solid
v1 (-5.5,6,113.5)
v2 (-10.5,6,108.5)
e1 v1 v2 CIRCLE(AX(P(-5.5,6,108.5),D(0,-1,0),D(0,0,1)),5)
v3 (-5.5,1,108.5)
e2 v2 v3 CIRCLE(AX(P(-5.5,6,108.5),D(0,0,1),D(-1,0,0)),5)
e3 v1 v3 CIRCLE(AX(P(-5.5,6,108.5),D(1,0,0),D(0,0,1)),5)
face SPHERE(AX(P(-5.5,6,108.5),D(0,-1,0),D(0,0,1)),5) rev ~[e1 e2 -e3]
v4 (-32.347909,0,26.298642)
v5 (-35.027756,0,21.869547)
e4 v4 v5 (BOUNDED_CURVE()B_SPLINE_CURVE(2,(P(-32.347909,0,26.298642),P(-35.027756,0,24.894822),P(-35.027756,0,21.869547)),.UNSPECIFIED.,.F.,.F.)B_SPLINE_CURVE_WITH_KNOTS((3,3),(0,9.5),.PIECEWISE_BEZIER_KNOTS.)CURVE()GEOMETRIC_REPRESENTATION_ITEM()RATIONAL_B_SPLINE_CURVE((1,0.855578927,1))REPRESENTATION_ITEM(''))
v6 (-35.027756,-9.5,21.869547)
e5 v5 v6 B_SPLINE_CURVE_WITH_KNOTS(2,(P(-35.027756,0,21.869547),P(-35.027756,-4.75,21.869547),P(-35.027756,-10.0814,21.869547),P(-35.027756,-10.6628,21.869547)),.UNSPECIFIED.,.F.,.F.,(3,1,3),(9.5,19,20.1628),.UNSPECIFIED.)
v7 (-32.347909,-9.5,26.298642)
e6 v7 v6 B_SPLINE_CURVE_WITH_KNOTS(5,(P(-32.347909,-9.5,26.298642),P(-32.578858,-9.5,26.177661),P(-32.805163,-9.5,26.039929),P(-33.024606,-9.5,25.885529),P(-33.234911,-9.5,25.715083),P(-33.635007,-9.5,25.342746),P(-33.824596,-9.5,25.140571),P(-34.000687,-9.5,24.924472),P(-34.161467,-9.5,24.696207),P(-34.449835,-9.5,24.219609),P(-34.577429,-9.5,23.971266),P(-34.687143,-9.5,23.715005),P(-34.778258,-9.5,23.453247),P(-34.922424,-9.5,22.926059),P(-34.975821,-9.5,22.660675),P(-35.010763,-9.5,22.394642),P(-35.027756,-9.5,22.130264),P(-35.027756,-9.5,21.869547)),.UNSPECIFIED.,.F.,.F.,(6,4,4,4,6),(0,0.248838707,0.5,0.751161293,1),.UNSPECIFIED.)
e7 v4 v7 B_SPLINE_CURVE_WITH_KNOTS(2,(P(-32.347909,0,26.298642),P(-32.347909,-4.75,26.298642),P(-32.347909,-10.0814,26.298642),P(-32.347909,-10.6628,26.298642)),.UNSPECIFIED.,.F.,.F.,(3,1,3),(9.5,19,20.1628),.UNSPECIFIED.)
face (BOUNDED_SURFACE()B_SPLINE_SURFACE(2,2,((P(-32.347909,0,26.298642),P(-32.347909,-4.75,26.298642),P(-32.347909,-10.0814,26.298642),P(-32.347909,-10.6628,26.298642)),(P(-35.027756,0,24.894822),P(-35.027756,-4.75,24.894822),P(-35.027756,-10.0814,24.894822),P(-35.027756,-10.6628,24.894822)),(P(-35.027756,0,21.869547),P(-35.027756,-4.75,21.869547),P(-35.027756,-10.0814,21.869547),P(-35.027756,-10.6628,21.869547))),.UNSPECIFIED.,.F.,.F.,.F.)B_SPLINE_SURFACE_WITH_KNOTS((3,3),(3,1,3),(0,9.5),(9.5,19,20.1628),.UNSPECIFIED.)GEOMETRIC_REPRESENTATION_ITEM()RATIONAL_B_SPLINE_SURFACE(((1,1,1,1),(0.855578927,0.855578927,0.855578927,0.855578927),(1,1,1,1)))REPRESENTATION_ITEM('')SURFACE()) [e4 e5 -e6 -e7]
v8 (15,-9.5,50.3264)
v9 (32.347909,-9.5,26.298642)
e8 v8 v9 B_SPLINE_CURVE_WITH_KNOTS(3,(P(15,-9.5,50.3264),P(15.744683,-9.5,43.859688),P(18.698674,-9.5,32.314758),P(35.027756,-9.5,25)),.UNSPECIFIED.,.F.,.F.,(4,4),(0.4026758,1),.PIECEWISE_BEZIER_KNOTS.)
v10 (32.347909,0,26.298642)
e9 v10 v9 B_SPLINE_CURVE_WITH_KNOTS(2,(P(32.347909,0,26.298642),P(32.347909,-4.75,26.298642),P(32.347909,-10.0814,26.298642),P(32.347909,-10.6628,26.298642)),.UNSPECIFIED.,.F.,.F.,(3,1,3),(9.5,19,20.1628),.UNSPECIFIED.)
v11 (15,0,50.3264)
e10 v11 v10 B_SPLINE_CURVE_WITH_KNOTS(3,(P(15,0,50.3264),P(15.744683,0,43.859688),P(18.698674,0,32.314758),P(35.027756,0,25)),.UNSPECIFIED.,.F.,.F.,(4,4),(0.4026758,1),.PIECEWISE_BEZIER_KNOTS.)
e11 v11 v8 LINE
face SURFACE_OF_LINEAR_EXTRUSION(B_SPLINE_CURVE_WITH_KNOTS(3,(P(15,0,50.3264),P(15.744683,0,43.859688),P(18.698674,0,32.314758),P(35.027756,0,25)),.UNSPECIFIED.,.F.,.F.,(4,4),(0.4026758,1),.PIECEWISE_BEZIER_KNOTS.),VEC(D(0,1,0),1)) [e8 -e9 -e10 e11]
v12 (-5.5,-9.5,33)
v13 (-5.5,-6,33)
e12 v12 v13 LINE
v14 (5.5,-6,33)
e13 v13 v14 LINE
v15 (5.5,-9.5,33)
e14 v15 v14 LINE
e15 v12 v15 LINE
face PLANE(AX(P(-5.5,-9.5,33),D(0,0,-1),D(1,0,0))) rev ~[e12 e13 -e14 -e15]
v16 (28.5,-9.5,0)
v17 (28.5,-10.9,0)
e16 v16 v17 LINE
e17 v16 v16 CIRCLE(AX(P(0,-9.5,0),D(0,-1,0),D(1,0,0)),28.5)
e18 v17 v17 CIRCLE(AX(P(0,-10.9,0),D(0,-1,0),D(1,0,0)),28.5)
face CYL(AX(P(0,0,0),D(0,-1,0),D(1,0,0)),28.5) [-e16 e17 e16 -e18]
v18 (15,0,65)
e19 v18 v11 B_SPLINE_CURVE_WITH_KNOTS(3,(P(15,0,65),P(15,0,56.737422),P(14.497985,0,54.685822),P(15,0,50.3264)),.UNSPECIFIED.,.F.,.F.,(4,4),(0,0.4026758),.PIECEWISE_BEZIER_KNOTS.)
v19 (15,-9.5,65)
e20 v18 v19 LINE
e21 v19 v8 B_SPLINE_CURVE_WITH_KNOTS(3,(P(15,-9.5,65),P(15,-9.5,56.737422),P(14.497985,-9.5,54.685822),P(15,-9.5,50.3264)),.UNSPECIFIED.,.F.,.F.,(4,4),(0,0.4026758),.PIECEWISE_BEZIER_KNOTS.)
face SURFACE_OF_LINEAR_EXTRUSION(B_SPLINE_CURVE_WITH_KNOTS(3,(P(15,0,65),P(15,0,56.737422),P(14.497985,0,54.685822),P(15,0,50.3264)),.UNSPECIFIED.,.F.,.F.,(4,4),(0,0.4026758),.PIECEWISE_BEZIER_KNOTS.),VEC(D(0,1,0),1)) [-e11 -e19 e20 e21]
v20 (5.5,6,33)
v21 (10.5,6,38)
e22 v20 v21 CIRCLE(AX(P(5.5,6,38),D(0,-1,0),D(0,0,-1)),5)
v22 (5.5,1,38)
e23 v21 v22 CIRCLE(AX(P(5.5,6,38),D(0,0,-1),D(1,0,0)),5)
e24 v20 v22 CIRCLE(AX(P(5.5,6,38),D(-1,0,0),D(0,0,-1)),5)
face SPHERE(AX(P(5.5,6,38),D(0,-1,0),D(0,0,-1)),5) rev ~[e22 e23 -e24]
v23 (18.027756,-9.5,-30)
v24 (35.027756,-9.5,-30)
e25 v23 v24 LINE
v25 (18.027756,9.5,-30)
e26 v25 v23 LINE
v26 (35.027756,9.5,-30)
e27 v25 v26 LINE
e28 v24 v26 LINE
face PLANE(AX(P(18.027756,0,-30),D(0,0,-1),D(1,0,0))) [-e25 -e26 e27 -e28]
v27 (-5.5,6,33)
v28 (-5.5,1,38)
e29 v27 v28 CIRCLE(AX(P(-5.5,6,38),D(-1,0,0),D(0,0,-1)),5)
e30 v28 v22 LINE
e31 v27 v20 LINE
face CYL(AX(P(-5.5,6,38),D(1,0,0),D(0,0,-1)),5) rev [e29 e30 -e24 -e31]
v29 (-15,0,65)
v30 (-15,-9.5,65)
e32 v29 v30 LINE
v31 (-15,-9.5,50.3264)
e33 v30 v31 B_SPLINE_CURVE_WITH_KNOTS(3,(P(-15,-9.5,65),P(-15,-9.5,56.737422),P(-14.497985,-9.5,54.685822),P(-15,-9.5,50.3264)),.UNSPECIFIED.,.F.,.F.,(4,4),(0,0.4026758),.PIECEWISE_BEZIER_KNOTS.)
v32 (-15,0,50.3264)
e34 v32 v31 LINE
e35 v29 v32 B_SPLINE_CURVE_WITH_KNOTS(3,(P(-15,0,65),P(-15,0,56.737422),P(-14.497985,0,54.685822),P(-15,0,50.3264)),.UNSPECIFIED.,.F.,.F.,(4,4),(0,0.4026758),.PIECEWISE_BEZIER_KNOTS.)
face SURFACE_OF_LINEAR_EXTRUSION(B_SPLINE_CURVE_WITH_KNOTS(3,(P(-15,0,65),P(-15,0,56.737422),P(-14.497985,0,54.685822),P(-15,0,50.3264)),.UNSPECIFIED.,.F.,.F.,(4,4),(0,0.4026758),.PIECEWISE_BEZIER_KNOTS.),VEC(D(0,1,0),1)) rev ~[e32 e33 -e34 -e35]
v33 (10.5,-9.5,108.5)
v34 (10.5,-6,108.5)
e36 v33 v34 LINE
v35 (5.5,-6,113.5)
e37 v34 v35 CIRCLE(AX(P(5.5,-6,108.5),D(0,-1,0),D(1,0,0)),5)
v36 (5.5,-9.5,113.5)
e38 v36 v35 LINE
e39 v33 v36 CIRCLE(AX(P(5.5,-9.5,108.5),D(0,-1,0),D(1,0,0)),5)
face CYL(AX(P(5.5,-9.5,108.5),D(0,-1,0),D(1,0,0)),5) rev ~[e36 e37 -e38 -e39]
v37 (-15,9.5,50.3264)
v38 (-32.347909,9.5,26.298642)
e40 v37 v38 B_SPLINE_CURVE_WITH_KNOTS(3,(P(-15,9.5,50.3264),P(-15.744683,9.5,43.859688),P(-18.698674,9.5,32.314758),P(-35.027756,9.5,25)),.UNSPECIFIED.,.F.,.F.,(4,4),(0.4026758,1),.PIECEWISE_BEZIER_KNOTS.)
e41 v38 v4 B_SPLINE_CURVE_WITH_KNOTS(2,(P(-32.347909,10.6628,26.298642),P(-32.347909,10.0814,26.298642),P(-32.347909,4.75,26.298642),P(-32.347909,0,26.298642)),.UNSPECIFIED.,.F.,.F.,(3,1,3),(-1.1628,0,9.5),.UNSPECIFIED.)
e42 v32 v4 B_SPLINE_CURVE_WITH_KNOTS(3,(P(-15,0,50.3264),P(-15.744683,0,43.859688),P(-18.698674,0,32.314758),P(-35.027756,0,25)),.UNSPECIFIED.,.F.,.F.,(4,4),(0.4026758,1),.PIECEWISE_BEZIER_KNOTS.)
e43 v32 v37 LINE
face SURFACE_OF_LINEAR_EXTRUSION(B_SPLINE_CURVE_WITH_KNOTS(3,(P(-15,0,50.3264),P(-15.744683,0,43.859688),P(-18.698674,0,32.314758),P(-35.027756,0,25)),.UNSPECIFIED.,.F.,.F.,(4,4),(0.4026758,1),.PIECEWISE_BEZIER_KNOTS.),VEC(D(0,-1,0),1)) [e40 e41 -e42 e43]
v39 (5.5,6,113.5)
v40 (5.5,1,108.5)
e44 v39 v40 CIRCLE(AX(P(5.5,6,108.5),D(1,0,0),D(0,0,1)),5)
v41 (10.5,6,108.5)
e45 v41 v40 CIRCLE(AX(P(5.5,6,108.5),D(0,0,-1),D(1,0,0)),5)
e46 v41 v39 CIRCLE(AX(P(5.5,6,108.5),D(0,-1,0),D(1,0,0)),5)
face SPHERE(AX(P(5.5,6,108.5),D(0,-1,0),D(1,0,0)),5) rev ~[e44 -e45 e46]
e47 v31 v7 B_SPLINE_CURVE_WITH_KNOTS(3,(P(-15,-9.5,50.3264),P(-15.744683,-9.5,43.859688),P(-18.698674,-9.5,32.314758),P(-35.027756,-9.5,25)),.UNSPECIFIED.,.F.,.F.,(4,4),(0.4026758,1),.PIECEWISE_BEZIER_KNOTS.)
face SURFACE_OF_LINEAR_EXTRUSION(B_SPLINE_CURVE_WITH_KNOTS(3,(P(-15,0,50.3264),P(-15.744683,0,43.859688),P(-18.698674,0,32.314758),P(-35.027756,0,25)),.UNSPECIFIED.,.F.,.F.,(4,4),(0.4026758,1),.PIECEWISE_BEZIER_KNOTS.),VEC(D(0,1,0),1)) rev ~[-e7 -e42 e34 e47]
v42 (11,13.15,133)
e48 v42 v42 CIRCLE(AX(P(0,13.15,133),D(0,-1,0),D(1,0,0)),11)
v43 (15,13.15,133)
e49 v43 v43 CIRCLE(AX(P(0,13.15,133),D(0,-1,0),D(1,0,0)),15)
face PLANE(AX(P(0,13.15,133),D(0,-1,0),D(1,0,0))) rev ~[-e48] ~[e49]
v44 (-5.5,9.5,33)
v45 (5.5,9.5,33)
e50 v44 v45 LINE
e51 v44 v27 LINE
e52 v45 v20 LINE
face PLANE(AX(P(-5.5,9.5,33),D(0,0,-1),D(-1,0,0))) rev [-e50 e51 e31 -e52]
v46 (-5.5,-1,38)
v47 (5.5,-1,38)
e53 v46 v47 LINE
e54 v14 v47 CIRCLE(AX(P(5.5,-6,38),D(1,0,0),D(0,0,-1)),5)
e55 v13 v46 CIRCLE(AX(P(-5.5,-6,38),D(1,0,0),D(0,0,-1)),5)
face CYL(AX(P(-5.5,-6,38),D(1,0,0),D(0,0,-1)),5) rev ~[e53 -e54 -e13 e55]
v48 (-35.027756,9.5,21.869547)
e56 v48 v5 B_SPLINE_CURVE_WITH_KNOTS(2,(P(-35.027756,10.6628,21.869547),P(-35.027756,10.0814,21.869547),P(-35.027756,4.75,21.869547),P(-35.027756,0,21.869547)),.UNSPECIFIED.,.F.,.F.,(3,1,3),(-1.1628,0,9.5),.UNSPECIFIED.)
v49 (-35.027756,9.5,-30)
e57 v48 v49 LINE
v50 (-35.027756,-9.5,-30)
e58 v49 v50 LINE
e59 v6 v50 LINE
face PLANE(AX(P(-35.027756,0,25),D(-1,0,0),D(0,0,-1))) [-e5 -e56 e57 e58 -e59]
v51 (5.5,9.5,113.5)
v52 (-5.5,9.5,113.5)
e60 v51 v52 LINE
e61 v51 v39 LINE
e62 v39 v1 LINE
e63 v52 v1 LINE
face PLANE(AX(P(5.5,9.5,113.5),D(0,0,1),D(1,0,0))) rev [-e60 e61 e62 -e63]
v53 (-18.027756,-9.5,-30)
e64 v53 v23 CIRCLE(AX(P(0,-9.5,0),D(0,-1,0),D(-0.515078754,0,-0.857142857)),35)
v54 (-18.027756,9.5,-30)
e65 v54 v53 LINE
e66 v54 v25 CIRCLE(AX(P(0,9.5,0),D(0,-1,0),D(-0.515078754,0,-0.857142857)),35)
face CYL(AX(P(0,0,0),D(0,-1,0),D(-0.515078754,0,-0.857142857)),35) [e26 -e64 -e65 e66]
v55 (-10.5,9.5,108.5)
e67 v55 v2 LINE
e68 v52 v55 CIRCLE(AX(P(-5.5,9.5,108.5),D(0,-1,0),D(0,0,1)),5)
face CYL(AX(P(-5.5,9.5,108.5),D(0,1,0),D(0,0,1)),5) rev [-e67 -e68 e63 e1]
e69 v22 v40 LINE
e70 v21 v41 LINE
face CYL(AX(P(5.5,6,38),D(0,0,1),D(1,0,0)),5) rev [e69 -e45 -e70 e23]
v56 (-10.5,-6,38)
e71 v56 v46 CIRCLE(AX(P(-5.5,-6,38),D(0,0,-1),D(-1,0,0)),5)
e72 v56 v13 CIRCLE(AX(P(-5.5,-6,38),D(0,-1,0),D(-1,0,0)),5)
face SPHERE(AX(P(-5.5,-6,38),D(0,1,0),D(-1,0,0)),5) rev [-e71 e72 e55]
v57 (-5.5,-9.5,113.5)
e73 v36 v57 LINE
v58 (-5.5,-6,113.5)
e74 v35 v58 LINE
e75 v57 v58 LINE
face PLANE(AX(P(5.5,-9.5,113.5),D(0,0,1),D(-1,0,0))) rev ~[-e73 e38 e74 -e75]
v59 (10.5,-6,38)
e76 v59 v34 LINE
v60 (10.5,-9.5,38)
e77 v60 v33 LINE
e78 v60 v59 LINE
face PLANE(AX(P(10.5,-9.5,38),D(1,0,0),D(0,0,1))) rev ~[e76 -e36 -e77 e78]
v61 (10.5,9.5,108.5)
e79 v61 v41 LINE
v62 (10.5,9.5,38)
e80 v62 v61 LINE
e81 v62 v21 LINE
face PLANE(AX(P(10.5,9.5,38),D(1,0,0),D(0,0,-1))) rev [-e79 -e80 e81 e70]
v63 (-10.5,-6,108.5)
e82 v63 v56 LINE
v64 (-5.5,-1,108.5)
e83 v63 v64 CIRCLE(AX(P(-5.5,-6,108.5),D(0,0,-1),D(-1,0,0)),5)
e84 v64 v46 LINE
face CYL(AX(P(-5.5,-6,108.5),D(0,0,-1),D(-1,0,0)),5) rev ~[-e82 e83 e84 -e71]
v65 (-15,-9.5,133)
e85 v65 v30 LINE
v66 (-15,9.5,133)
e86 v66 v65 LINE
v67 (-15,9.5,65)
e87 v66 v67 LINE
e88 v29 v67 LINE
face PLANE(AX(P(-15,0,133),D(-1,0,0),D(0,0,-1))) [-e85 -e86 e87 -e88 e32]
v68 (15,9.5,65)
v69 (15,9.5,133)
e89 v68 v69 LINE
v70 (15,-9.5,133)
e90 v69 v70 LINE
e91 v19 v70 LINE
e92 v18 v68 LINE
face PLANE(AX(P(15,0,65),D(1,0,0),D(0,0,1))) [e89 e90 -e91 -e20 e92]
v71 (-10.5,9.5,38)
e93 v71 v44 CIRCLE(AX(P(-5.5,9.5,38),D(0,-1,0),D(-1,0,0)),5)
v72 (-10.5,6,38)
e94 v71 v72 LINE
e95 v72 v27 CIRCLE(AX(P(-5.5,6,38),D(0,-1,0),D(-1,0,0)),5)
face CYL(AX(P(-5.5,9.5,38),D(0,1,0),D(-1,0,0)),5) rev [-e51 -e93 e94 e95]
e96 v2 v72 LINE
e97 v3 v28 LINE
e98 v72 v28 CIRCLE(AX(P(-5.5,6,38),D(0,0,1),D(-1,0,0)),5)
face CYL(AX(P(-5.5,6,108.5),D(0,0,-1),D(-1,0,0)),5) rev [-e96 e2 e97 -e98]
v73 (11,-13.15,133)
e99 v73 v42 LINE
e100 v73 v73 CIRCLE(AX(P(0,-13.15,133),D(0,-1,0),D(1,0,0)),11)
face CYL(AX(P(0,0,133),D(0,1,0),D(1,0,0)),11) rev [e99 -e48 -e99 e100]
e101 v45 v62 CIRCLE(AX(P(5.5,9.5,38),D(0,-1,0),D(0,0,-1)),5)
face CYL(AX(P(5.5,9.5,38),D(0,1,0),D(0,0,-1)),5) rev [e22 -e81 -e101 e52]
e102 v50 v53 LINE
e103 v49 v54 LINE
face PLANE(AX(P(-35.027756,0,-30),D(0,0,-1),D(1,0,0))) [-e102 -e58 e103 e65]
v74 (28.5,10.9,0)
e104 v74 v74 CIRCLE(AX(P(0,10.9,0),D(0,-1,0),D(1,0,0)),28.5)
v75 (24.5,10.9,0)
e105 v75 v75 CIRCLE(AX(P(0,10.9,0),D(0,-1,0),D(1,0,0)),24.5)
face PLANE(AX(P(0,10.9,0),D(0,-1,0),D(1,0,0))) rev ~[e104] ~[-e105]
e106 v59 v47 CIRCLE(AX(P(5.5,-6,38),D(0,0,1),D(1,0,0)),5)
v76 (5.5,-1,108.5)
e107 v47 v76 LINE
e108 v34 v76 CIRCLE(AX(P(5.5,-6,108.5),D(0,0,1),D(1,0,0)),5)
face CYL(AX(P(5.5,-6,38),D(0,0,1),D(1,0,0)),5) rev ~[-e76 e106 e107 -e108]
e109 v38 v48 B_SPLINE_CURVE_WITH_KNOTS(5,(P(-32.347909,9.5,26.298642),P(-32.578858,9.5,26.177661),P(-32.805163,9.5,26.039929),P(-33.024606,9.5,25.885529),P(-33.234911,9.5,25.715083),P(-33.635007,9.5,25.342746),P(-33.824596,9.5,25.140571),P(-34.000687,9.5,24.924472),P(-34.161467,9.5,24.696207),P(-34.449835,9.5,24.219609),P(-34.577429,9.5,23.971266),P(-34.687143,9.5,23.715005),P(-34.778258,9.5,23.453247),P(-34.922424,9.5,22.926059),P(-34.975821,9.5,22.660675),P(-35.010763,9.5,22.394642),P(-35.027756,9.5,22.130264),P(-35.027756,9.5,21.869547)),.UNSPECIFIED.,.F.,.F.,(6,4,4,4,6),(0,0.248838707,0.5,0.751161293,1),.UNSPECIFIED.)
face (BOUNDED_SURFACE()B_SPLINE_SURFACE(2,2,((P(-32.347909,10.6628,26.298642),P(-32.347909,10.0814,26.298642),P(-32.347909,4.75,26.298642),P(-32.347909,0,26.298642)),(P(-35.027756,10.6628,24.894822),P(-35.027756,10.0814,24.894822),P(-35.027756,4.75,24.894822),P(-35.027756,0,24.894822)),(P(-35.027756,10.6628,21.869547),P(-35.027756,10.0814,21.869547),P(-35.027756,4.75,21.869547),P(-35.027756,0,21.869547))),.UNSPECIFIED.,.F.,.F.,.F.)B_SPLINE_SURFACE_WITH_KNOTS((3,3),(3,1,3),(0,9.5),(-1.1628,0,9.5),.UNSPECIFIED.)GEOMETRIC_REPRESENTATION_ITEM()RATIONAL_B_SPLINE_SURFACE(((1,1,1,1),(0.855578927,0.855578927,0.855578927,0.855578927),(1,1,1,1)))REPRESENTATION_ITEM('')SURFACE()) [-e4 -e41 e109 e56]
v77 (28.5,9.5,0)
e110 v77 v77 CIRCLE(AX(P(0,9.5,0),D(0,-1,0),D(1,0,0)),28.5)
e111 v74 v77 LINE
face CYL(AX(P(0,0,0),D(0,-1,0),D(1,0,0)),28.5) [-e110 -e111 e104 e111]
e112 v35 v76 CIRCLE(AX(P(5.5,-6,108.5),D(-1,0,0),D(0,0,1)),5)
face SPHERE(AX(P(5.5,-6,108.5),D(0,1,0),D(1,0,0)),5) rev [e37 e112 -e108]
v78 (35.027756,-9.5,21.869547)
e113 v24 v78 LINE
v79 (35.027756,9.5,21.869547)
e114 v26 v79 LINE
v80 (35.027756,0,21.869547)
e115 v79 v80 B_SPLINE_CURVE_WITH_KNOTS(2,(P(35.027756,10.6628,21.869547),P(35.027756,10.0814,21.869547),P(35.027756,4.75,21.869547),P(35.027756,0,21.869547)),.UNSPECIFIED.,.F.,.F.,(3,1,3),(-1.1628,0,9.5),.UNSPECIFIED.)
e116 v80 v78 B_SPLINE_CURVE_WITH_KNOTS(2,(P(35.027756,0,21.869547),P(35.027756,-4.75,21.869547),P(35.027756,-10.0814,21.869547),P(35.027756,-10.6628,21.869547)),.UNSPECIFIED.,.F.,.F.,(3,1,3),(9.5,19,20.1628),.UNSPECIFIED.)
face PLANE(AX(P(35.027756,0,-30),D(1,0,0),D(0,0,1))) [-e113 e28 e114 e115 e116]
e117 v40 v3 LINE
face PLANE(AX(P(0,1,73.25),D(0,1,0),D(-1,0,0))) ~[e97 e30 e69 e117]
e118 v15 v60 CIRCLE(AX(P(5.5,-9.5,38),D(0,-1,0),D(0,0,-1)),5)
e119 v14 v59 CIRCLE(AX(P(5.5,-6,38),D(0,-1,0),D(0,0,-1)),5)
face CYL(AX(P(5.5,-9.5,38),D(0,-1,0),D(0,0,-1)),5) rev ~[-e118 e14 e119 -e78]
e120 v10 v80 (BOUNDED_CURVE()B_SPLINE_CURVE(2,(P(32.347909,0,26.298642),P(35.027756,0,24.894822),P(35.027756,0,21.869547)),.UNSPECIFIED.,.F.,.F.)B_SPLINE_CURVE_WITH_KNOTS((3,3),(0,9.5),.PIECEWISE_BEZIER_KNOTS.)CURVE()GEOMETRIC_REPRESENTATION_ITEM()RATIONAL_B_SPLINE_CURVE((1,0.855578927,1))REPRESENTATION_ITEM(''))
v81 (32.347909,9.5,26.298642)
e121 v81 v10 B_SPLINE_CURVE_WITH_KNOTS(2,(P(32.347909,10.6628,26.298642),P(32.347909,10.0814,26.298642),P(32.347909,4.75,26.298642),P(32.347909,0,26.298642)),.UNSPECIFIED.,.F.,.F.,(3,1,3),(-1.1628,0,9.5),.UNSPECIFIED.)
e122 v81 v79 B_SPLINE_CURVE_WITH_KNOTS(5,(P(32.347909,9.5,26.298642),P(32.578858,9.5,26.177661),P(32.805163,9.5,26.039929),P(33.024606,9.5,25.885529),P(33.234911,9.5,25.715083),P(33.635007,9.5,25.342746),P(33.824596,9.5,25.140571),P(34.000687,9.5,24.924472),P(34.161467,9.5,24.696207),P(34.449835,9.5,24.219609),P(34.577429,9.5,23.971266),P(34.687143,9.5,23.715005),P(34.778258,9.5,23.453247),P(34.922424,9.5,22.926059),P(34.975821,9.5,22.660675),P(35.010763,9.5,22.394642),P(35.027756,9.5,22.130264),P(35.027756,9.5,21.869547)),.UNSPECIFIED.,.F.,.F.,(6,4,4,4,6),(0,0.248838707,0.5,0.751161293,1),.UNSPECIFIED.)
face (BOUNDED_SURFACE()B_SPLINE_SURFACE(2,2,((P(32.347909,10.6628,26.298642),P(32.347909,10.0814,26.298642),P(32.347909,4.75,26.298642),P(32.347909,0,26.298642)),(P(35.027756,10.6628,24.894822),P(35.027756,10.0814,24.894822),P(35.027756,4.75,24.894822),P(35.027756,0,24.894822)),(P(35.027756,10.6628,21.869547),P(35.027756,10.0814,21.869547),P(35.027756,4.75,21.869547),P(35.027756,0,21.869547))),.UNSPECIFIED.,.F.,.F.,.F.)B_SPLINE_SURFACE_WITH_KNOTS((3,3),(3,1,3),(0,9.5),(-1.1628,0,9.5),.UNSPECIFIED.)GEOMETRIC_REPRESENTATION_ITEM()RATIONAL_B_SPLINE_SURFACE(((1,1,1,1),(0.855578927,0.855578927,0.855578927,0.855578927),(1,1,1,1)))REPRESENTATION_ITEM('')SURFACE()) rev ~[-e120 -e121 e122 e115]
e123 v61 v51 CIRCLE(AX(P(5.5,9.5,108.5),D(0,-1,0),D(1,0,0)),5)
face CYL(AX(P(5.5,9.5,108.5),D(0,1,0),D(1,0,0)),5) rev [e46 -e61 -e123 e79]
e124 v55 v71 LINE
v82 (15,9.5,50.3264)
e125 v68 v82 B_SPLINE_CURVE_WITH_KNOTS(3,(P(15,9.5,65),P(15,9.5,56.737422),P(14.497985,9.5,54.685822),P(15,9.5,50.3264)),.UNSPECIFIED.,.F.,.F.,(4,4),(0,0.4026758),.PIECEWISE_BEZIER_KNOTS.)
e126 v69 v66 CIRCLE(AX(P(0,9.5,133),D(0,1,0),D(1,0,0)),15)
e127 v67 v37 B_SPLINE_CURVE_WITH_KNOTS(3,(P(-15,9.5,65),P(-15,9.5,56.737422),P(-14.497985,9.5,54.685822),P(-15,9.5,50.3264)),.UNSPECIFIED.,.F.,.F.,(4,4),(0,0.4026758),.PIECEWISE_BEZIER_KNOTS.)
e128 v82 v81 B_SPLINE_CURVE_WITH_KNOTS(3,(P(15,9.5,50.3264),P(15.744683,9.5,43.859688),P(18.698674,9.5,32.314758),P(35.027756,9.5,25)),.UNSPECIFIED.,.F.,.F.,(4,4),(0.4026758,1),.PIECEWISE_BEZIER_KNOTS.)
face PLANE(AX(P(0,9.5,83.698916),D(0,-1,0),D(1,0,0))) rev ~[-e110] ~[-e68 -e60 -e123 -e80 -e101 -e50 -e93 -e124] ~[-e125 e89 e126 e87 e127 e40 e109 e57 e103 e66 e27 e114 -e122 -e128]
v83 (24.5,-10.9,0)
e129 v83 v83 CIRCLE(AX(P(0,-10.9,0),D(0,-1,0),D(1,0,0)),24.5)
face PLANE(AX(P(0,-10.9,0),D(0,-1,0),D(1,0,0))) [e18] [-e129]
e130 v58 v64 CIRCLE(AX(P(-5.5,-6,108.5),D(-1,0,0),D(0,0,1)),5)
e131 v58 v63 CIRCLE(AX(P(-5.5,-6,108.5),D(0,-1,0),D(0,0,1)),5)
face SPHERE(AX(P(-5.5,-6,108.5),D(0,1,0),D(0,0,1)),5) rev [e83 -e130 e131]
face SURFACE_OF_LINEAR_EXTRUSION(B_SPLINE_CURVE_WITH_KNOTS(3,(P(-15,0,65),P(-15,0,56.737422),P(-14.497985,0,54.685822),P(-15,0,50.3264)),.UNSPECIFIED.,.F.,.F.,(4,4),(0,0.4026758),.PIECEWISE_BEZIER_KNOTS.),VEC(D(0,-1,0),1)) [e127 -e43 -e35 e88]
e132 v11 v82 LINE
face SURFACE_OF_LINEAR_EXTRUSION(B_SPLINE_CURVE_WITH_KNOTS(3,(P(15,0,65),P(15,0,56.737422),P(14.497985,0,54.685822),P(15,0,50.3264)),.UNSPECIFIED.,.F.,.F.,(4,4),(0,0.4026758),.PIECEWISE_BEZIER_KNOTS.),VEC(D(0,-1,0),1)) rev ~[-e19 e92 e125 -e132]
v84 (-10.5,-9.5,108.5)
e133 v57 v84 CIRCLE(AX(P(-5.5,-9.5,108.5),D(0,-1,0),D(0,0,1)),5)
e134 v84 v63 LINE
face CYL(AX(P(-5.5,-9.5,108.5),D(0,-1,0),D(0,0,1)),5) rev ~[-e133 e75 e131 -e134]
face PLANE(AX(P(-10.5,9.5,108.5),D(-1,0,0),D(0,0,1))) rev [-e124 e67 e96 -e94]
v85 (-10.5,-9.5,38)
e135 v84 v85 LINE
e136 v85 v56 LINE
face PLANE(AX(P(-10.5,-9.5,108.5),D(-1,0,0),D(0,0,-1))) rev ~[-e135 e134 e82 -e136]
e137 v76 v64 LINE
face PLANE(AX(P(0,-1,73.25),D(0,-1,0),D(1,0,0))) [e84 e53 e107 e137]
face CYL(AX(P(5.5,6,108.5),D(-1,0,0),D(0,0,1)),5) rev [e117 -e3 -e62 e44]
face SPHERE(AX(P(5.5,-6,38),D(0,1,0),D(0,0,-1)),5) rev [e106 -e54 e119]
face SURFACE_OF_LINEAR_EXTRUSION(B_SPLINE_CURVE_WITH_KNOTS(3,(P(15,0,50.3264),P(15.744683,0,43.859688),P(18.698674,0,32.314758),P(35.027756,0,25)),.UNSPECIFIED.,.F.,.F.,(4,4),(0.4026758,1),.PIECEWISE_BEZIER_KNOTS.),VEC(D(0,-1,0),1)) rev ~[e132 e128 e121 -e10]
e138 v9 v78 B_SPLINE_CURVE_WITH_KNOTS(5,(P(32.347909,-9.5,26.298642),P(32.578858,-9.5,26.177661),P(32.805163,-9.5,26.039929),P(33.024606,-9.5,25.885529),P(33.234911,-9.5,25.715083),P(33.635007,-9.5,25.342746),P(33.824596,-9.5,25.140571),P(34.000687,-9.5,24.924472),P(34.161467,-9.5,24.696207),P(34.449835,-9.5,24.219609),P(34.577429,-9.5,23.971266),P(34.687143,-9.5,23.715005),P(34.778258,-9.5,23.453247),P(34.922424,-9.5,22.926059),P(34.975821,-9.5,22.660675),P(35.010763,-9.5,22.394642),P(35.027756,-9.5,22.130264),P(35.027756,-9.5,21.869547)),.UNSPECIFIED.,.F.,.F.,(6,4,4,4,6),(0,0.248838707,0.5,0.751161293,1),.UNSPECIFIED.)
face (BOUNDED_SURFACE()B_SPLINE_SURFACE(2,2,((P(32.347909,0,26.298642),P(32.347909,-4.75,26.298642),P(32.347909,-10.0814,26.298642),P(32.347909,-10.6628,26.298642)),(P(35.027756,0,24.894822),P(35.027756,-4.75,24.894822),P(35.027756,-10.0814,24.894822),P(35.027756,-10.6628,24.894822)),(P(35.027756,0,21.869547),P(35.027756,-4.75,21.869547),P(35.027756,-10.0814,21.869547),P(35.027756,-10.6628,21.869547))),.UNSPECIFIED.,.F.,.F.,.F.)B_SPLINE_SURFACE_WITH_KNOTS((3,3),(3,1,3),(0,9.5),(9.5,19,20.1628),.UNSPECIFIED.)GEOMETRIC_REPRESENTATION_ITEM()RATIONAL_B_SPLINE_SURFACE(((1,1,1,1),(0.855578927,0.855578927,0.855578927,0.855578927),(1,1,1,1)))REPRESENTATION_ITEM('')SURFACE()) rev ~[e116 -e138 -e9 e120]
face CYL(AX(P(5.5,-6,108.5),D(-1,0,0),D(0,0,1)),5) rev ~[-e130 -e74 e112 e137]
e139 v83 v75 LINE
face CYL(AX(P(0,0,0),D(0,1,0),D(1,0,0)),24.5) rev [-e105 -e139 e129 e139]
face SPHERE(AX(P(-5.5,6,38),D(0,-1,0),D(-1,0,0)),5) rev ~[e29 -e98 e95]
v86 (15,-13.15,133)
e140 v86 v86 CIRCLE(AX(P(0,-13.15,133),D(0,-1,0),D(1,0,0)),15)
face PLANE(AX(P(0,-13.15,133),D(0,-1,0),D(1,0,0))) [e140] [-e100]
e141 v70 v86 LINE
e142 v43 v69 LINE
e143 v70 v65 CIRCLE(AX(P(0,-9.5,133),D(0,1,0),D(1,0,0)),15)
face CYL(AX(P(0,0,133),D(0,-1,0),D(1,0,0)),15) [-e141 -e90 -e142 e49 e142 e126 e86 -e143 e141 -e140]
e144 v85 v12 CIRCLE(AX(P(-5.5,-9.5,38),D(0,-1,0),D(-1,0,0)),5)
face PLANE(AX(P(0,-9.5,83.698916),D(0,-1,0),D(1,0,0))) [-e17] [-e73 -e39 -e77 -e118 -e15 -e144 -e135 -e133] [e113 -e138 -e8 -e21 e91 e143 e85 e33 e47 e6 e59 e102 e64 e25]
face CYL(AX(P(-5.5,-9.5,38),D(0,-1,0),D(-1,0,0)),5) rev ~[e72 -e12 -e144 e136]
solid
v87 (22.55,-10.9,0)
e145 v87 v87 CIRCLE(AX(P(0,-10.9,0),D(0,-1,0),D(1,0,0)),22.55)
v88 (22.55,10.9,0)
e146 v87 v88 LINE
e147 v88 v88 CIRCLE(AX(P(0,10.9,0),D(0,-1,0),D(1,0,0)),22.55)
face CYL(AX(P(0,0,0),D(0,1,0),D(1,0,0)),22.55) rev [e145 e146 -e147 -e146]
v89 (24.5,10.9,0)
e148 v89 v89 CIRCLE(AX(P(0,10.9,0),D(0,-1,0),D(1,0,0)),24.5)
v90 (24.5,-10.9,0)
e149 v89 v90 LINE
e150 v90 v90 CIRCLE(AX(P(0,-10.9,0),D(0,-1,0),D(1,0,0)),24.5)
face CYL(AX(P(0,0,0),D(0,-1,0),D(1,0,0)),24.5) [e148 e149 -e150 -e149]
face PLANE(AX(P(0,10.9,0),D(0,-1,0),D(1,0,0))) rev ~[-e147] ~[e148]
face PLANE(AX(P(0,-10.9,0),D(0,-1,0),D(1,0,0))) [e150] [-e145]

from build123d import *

# Parameters (mm, degrees)
F0_R     = 28.5
F1_DEPTH = 9.5
F0_R_2   = 24.5
F2_DEPTH = 10.9
F0_R_3   = 11
F3_DEPTH = 13.15
F0_R_4   = 22.55
F4_DEPTH = 10.9
F6_DEPTH = 8.5
F7_R     = 5
F9_R     = 5


# Not quite as in the source:
# - a feature of the source that left no trace in its solid (it failed there, or was rolled back) is left out
# - a pattern or mirror of a feature is missing from the dataset's text; its kind, count and spacing are read off the source's solid


with BuildPart() as f1:
    # F0 (on Front) → F1 (new body, symmetric)
    with BuildSketch(Plane.XZ):
        with BuildLine():
            Line((15, 65), (15, 133))
            ThreePointArc((15, 133), (0, 118), (-15, 133))
            Line((-15, 133), (-15, 65))
            add(Edge.make_bspline(
                [(-15, 65), (-15, 56.7374224028), (-14.4979846104, 54.6858215893), (-15, 50.3263995051)],
                knots=[0, 0, 0, 0, 0.4026758, 0.4026758, 0.4026758, 0.4026758], degree=3))
            Line((-15, 50.3263995051), (-15, 31.6227766017))
            ThreePointArc((-15, 31.6227766017), (0, 35), (15, 31.6227766017))
            Line((15, 31.6227766017), (15, 50.3263995051))
            add(Edge.make_bspline(
                [(15, 65), (15, 56.7374224028), (14.4979846104, 54.6858215893), (15, 50.3263995051)],
                knots=[0, 0, 0, 0, 0.4026758, 0.4026758, 0.4026758, 0.4026758], degree=3))
        make_face()
        with BuildLine():
            Line((-15, 31.6227766017), (-15, 50.3263995051))
            add(Edge.make_bspline(
                [(-15, 50.3263995051), (-15.7446832935, 43.8596878017), (-18.6986741861, 32.3147582025), (-35.0277563773, 25)],
                knots=[0.4026758, 0.4026758, 0.4026758, 0.4026758, 1, 1, 1, 1], degree=3))
            Line((-35.0277563773, 25), (-35.0277563773, -30))
            Line((-35.0277563773, -30), (-18.0277563773, -30))
            ThreePointArc((-18.0277563773, -30), (-34.9578291925, 1.7176082629), (-15, 31.6227766017))
        make_face()
        with BuildLine():
            add(Edge.make_bspline(
                [(15, 50.3263995051), (15.7446832935, 43.8596878017), (18.6986741861, 32.3147582025), (35.0277563773, 25)],
                knots=[0.4026758, 0.4026758, 0.4026758, 0.4026758, 1, 1, 1, 1], degree=3))
            Line((15, 50.3263995051), (15, 31.6227766017))
            ThreePointArc((15, 31.6227766017), (29.5803989155, 18.7082869339), (35, 0))
            ThreePointArc((35, 0), (30.4628583131, -17.2341017578), (18.0277563773, -30))
            Line((18.0277563773, -30), (35.0277563773, -30))
            Line((35.0277563773, -30), (35.0277563773, 25))
        make_face()
        with BuildLine():
            ThreePointArc((35, 0), (29.5803989155, 18.7082869339), (15, 31.6227766017))
            ThreePointArc((15, 31.6227766017), (0, 35), (-15, 31.6227766017))
            ThreePointArc((-15, 31.6227766017), (-34.9578291925, 1.7176082629), (-18.0277563773, -30))
            ThreePointArc((-18.0277563773, -30), (0, -35), (18.0277563773, -30))
            ThreePointArc((18.0277563773, -30), (30.4628583131, -17.2341017578), (35, 0))
        make_face()
        Circle(F0_R, mode=Mode.SUBTRACT)
    extrude(amount=F1_DEPTH, both=True)

    # F0 (on Front) → F2 (join, symmetric)
    with BuildSketch(Plane.XZ):
        Circle(F0_R)
        Circle(F0_R_2, mode=Mode.SUBTRACT)
    extrude(amount=F2_DEPTH, both=True)

    # F0 (on Front) → F3 (join, symmetric)
    with BuildSketch(Plane.XZ):
        with BuildLine():
            ThreePointArc((-15, 133), (0, 118), (15, 133))
            ThreePointArc((15, 133), (0, 148), (-15, 133))
        make_face()
        with Locations((0, 133)):
            Circle(F0_R_3, mode=Mode.SUBTRACT)
    extrude(amount=F3_DEPTH, both=True)

    # F5 (on face) → F6 (cut)
    with BuildSketch(Plane.XZ.offset(9.5)):
        with BuildLine():
            Line((5.5, 113.5), (-5.5, 113.5))
            ThreePointArc((-5.5, 113.5), (-9.0355339059, 112.0355339059), (-10.5, 108.5))
            Line((-10.5, 108.5), (-10.5, 38))
            ThreePointArc((-10.5, 38), (-9.0355339059, 34.4644660941), (-5.5, 33))
            Line((-5.5, 33), (5.5, 33))
            ThreePointArc((5.5, 33), (9.0355339059, 34.4644660941), (10.5, 38))
            Line((10.5, 38), (10.5, 108.5))
            ThreePointArc((10.5, 108.5), (9.0355339059, 112.0355339059), (5.5, 113.5))
        make_face()
    f6 = extrude(amount=-F6_DEPTH, mode=Mode.SUBTRACT)

    # F6_copies: F6 across plane
    add(f6.mirror(Plane.ZX), mode=Mode.SUBTRACT)

    # F7
    f7_edges = [f1.edges().sort_by_distance(p)[0] for p in [
        (10.5, -1, 73.25),
        (0, -1, 113.5),
        (9.035534, -1, 112.035534),
        (-9.035534, -1, 112.035534),
        (-10.5, -1, 73.25),
        (-9.035534, -1, 34.464466),
        (0, -1, 33),
        (9.035534, -1, 34.464466),
    ]]
    fillet(f7_edges, radius=F7_R)

    # F9
    f9_edges = [f1.edges().sort_by_distance(p)[0] for p in [
        (35.027756, -4.75, 25),
        (35.027756, 4.75, 25),
        (-35.027756, -4.75, 25),
        (-35.027756, 4.75, 25),
        (9.035534, 1, 112.035534),
        (0, 1, 113.5),
        (-9.035534, 1, 112.035534),
        (-10.5, 1, 73.25),
        (-9.035534, 1, 34.464466),
        (0, 1, 33),
        (9.035534, 1, 34.464466),
        (10.5, 1, 73.25),
    ]]
    fillet(f9_edges, radius=F9_R)


with BuildPart() as f4:
    # F0 (on Front) → F4 (new body, symmetric)
    with BuildSketch(Plane.XZ):
        Circle(F0_R_2)
        Circle(F0_R_4, mode=Mode.SUBTRACT)
    extrude(amount=F4_DEPTH, both=True)


solid = Compound([f1.part, f4.part])
